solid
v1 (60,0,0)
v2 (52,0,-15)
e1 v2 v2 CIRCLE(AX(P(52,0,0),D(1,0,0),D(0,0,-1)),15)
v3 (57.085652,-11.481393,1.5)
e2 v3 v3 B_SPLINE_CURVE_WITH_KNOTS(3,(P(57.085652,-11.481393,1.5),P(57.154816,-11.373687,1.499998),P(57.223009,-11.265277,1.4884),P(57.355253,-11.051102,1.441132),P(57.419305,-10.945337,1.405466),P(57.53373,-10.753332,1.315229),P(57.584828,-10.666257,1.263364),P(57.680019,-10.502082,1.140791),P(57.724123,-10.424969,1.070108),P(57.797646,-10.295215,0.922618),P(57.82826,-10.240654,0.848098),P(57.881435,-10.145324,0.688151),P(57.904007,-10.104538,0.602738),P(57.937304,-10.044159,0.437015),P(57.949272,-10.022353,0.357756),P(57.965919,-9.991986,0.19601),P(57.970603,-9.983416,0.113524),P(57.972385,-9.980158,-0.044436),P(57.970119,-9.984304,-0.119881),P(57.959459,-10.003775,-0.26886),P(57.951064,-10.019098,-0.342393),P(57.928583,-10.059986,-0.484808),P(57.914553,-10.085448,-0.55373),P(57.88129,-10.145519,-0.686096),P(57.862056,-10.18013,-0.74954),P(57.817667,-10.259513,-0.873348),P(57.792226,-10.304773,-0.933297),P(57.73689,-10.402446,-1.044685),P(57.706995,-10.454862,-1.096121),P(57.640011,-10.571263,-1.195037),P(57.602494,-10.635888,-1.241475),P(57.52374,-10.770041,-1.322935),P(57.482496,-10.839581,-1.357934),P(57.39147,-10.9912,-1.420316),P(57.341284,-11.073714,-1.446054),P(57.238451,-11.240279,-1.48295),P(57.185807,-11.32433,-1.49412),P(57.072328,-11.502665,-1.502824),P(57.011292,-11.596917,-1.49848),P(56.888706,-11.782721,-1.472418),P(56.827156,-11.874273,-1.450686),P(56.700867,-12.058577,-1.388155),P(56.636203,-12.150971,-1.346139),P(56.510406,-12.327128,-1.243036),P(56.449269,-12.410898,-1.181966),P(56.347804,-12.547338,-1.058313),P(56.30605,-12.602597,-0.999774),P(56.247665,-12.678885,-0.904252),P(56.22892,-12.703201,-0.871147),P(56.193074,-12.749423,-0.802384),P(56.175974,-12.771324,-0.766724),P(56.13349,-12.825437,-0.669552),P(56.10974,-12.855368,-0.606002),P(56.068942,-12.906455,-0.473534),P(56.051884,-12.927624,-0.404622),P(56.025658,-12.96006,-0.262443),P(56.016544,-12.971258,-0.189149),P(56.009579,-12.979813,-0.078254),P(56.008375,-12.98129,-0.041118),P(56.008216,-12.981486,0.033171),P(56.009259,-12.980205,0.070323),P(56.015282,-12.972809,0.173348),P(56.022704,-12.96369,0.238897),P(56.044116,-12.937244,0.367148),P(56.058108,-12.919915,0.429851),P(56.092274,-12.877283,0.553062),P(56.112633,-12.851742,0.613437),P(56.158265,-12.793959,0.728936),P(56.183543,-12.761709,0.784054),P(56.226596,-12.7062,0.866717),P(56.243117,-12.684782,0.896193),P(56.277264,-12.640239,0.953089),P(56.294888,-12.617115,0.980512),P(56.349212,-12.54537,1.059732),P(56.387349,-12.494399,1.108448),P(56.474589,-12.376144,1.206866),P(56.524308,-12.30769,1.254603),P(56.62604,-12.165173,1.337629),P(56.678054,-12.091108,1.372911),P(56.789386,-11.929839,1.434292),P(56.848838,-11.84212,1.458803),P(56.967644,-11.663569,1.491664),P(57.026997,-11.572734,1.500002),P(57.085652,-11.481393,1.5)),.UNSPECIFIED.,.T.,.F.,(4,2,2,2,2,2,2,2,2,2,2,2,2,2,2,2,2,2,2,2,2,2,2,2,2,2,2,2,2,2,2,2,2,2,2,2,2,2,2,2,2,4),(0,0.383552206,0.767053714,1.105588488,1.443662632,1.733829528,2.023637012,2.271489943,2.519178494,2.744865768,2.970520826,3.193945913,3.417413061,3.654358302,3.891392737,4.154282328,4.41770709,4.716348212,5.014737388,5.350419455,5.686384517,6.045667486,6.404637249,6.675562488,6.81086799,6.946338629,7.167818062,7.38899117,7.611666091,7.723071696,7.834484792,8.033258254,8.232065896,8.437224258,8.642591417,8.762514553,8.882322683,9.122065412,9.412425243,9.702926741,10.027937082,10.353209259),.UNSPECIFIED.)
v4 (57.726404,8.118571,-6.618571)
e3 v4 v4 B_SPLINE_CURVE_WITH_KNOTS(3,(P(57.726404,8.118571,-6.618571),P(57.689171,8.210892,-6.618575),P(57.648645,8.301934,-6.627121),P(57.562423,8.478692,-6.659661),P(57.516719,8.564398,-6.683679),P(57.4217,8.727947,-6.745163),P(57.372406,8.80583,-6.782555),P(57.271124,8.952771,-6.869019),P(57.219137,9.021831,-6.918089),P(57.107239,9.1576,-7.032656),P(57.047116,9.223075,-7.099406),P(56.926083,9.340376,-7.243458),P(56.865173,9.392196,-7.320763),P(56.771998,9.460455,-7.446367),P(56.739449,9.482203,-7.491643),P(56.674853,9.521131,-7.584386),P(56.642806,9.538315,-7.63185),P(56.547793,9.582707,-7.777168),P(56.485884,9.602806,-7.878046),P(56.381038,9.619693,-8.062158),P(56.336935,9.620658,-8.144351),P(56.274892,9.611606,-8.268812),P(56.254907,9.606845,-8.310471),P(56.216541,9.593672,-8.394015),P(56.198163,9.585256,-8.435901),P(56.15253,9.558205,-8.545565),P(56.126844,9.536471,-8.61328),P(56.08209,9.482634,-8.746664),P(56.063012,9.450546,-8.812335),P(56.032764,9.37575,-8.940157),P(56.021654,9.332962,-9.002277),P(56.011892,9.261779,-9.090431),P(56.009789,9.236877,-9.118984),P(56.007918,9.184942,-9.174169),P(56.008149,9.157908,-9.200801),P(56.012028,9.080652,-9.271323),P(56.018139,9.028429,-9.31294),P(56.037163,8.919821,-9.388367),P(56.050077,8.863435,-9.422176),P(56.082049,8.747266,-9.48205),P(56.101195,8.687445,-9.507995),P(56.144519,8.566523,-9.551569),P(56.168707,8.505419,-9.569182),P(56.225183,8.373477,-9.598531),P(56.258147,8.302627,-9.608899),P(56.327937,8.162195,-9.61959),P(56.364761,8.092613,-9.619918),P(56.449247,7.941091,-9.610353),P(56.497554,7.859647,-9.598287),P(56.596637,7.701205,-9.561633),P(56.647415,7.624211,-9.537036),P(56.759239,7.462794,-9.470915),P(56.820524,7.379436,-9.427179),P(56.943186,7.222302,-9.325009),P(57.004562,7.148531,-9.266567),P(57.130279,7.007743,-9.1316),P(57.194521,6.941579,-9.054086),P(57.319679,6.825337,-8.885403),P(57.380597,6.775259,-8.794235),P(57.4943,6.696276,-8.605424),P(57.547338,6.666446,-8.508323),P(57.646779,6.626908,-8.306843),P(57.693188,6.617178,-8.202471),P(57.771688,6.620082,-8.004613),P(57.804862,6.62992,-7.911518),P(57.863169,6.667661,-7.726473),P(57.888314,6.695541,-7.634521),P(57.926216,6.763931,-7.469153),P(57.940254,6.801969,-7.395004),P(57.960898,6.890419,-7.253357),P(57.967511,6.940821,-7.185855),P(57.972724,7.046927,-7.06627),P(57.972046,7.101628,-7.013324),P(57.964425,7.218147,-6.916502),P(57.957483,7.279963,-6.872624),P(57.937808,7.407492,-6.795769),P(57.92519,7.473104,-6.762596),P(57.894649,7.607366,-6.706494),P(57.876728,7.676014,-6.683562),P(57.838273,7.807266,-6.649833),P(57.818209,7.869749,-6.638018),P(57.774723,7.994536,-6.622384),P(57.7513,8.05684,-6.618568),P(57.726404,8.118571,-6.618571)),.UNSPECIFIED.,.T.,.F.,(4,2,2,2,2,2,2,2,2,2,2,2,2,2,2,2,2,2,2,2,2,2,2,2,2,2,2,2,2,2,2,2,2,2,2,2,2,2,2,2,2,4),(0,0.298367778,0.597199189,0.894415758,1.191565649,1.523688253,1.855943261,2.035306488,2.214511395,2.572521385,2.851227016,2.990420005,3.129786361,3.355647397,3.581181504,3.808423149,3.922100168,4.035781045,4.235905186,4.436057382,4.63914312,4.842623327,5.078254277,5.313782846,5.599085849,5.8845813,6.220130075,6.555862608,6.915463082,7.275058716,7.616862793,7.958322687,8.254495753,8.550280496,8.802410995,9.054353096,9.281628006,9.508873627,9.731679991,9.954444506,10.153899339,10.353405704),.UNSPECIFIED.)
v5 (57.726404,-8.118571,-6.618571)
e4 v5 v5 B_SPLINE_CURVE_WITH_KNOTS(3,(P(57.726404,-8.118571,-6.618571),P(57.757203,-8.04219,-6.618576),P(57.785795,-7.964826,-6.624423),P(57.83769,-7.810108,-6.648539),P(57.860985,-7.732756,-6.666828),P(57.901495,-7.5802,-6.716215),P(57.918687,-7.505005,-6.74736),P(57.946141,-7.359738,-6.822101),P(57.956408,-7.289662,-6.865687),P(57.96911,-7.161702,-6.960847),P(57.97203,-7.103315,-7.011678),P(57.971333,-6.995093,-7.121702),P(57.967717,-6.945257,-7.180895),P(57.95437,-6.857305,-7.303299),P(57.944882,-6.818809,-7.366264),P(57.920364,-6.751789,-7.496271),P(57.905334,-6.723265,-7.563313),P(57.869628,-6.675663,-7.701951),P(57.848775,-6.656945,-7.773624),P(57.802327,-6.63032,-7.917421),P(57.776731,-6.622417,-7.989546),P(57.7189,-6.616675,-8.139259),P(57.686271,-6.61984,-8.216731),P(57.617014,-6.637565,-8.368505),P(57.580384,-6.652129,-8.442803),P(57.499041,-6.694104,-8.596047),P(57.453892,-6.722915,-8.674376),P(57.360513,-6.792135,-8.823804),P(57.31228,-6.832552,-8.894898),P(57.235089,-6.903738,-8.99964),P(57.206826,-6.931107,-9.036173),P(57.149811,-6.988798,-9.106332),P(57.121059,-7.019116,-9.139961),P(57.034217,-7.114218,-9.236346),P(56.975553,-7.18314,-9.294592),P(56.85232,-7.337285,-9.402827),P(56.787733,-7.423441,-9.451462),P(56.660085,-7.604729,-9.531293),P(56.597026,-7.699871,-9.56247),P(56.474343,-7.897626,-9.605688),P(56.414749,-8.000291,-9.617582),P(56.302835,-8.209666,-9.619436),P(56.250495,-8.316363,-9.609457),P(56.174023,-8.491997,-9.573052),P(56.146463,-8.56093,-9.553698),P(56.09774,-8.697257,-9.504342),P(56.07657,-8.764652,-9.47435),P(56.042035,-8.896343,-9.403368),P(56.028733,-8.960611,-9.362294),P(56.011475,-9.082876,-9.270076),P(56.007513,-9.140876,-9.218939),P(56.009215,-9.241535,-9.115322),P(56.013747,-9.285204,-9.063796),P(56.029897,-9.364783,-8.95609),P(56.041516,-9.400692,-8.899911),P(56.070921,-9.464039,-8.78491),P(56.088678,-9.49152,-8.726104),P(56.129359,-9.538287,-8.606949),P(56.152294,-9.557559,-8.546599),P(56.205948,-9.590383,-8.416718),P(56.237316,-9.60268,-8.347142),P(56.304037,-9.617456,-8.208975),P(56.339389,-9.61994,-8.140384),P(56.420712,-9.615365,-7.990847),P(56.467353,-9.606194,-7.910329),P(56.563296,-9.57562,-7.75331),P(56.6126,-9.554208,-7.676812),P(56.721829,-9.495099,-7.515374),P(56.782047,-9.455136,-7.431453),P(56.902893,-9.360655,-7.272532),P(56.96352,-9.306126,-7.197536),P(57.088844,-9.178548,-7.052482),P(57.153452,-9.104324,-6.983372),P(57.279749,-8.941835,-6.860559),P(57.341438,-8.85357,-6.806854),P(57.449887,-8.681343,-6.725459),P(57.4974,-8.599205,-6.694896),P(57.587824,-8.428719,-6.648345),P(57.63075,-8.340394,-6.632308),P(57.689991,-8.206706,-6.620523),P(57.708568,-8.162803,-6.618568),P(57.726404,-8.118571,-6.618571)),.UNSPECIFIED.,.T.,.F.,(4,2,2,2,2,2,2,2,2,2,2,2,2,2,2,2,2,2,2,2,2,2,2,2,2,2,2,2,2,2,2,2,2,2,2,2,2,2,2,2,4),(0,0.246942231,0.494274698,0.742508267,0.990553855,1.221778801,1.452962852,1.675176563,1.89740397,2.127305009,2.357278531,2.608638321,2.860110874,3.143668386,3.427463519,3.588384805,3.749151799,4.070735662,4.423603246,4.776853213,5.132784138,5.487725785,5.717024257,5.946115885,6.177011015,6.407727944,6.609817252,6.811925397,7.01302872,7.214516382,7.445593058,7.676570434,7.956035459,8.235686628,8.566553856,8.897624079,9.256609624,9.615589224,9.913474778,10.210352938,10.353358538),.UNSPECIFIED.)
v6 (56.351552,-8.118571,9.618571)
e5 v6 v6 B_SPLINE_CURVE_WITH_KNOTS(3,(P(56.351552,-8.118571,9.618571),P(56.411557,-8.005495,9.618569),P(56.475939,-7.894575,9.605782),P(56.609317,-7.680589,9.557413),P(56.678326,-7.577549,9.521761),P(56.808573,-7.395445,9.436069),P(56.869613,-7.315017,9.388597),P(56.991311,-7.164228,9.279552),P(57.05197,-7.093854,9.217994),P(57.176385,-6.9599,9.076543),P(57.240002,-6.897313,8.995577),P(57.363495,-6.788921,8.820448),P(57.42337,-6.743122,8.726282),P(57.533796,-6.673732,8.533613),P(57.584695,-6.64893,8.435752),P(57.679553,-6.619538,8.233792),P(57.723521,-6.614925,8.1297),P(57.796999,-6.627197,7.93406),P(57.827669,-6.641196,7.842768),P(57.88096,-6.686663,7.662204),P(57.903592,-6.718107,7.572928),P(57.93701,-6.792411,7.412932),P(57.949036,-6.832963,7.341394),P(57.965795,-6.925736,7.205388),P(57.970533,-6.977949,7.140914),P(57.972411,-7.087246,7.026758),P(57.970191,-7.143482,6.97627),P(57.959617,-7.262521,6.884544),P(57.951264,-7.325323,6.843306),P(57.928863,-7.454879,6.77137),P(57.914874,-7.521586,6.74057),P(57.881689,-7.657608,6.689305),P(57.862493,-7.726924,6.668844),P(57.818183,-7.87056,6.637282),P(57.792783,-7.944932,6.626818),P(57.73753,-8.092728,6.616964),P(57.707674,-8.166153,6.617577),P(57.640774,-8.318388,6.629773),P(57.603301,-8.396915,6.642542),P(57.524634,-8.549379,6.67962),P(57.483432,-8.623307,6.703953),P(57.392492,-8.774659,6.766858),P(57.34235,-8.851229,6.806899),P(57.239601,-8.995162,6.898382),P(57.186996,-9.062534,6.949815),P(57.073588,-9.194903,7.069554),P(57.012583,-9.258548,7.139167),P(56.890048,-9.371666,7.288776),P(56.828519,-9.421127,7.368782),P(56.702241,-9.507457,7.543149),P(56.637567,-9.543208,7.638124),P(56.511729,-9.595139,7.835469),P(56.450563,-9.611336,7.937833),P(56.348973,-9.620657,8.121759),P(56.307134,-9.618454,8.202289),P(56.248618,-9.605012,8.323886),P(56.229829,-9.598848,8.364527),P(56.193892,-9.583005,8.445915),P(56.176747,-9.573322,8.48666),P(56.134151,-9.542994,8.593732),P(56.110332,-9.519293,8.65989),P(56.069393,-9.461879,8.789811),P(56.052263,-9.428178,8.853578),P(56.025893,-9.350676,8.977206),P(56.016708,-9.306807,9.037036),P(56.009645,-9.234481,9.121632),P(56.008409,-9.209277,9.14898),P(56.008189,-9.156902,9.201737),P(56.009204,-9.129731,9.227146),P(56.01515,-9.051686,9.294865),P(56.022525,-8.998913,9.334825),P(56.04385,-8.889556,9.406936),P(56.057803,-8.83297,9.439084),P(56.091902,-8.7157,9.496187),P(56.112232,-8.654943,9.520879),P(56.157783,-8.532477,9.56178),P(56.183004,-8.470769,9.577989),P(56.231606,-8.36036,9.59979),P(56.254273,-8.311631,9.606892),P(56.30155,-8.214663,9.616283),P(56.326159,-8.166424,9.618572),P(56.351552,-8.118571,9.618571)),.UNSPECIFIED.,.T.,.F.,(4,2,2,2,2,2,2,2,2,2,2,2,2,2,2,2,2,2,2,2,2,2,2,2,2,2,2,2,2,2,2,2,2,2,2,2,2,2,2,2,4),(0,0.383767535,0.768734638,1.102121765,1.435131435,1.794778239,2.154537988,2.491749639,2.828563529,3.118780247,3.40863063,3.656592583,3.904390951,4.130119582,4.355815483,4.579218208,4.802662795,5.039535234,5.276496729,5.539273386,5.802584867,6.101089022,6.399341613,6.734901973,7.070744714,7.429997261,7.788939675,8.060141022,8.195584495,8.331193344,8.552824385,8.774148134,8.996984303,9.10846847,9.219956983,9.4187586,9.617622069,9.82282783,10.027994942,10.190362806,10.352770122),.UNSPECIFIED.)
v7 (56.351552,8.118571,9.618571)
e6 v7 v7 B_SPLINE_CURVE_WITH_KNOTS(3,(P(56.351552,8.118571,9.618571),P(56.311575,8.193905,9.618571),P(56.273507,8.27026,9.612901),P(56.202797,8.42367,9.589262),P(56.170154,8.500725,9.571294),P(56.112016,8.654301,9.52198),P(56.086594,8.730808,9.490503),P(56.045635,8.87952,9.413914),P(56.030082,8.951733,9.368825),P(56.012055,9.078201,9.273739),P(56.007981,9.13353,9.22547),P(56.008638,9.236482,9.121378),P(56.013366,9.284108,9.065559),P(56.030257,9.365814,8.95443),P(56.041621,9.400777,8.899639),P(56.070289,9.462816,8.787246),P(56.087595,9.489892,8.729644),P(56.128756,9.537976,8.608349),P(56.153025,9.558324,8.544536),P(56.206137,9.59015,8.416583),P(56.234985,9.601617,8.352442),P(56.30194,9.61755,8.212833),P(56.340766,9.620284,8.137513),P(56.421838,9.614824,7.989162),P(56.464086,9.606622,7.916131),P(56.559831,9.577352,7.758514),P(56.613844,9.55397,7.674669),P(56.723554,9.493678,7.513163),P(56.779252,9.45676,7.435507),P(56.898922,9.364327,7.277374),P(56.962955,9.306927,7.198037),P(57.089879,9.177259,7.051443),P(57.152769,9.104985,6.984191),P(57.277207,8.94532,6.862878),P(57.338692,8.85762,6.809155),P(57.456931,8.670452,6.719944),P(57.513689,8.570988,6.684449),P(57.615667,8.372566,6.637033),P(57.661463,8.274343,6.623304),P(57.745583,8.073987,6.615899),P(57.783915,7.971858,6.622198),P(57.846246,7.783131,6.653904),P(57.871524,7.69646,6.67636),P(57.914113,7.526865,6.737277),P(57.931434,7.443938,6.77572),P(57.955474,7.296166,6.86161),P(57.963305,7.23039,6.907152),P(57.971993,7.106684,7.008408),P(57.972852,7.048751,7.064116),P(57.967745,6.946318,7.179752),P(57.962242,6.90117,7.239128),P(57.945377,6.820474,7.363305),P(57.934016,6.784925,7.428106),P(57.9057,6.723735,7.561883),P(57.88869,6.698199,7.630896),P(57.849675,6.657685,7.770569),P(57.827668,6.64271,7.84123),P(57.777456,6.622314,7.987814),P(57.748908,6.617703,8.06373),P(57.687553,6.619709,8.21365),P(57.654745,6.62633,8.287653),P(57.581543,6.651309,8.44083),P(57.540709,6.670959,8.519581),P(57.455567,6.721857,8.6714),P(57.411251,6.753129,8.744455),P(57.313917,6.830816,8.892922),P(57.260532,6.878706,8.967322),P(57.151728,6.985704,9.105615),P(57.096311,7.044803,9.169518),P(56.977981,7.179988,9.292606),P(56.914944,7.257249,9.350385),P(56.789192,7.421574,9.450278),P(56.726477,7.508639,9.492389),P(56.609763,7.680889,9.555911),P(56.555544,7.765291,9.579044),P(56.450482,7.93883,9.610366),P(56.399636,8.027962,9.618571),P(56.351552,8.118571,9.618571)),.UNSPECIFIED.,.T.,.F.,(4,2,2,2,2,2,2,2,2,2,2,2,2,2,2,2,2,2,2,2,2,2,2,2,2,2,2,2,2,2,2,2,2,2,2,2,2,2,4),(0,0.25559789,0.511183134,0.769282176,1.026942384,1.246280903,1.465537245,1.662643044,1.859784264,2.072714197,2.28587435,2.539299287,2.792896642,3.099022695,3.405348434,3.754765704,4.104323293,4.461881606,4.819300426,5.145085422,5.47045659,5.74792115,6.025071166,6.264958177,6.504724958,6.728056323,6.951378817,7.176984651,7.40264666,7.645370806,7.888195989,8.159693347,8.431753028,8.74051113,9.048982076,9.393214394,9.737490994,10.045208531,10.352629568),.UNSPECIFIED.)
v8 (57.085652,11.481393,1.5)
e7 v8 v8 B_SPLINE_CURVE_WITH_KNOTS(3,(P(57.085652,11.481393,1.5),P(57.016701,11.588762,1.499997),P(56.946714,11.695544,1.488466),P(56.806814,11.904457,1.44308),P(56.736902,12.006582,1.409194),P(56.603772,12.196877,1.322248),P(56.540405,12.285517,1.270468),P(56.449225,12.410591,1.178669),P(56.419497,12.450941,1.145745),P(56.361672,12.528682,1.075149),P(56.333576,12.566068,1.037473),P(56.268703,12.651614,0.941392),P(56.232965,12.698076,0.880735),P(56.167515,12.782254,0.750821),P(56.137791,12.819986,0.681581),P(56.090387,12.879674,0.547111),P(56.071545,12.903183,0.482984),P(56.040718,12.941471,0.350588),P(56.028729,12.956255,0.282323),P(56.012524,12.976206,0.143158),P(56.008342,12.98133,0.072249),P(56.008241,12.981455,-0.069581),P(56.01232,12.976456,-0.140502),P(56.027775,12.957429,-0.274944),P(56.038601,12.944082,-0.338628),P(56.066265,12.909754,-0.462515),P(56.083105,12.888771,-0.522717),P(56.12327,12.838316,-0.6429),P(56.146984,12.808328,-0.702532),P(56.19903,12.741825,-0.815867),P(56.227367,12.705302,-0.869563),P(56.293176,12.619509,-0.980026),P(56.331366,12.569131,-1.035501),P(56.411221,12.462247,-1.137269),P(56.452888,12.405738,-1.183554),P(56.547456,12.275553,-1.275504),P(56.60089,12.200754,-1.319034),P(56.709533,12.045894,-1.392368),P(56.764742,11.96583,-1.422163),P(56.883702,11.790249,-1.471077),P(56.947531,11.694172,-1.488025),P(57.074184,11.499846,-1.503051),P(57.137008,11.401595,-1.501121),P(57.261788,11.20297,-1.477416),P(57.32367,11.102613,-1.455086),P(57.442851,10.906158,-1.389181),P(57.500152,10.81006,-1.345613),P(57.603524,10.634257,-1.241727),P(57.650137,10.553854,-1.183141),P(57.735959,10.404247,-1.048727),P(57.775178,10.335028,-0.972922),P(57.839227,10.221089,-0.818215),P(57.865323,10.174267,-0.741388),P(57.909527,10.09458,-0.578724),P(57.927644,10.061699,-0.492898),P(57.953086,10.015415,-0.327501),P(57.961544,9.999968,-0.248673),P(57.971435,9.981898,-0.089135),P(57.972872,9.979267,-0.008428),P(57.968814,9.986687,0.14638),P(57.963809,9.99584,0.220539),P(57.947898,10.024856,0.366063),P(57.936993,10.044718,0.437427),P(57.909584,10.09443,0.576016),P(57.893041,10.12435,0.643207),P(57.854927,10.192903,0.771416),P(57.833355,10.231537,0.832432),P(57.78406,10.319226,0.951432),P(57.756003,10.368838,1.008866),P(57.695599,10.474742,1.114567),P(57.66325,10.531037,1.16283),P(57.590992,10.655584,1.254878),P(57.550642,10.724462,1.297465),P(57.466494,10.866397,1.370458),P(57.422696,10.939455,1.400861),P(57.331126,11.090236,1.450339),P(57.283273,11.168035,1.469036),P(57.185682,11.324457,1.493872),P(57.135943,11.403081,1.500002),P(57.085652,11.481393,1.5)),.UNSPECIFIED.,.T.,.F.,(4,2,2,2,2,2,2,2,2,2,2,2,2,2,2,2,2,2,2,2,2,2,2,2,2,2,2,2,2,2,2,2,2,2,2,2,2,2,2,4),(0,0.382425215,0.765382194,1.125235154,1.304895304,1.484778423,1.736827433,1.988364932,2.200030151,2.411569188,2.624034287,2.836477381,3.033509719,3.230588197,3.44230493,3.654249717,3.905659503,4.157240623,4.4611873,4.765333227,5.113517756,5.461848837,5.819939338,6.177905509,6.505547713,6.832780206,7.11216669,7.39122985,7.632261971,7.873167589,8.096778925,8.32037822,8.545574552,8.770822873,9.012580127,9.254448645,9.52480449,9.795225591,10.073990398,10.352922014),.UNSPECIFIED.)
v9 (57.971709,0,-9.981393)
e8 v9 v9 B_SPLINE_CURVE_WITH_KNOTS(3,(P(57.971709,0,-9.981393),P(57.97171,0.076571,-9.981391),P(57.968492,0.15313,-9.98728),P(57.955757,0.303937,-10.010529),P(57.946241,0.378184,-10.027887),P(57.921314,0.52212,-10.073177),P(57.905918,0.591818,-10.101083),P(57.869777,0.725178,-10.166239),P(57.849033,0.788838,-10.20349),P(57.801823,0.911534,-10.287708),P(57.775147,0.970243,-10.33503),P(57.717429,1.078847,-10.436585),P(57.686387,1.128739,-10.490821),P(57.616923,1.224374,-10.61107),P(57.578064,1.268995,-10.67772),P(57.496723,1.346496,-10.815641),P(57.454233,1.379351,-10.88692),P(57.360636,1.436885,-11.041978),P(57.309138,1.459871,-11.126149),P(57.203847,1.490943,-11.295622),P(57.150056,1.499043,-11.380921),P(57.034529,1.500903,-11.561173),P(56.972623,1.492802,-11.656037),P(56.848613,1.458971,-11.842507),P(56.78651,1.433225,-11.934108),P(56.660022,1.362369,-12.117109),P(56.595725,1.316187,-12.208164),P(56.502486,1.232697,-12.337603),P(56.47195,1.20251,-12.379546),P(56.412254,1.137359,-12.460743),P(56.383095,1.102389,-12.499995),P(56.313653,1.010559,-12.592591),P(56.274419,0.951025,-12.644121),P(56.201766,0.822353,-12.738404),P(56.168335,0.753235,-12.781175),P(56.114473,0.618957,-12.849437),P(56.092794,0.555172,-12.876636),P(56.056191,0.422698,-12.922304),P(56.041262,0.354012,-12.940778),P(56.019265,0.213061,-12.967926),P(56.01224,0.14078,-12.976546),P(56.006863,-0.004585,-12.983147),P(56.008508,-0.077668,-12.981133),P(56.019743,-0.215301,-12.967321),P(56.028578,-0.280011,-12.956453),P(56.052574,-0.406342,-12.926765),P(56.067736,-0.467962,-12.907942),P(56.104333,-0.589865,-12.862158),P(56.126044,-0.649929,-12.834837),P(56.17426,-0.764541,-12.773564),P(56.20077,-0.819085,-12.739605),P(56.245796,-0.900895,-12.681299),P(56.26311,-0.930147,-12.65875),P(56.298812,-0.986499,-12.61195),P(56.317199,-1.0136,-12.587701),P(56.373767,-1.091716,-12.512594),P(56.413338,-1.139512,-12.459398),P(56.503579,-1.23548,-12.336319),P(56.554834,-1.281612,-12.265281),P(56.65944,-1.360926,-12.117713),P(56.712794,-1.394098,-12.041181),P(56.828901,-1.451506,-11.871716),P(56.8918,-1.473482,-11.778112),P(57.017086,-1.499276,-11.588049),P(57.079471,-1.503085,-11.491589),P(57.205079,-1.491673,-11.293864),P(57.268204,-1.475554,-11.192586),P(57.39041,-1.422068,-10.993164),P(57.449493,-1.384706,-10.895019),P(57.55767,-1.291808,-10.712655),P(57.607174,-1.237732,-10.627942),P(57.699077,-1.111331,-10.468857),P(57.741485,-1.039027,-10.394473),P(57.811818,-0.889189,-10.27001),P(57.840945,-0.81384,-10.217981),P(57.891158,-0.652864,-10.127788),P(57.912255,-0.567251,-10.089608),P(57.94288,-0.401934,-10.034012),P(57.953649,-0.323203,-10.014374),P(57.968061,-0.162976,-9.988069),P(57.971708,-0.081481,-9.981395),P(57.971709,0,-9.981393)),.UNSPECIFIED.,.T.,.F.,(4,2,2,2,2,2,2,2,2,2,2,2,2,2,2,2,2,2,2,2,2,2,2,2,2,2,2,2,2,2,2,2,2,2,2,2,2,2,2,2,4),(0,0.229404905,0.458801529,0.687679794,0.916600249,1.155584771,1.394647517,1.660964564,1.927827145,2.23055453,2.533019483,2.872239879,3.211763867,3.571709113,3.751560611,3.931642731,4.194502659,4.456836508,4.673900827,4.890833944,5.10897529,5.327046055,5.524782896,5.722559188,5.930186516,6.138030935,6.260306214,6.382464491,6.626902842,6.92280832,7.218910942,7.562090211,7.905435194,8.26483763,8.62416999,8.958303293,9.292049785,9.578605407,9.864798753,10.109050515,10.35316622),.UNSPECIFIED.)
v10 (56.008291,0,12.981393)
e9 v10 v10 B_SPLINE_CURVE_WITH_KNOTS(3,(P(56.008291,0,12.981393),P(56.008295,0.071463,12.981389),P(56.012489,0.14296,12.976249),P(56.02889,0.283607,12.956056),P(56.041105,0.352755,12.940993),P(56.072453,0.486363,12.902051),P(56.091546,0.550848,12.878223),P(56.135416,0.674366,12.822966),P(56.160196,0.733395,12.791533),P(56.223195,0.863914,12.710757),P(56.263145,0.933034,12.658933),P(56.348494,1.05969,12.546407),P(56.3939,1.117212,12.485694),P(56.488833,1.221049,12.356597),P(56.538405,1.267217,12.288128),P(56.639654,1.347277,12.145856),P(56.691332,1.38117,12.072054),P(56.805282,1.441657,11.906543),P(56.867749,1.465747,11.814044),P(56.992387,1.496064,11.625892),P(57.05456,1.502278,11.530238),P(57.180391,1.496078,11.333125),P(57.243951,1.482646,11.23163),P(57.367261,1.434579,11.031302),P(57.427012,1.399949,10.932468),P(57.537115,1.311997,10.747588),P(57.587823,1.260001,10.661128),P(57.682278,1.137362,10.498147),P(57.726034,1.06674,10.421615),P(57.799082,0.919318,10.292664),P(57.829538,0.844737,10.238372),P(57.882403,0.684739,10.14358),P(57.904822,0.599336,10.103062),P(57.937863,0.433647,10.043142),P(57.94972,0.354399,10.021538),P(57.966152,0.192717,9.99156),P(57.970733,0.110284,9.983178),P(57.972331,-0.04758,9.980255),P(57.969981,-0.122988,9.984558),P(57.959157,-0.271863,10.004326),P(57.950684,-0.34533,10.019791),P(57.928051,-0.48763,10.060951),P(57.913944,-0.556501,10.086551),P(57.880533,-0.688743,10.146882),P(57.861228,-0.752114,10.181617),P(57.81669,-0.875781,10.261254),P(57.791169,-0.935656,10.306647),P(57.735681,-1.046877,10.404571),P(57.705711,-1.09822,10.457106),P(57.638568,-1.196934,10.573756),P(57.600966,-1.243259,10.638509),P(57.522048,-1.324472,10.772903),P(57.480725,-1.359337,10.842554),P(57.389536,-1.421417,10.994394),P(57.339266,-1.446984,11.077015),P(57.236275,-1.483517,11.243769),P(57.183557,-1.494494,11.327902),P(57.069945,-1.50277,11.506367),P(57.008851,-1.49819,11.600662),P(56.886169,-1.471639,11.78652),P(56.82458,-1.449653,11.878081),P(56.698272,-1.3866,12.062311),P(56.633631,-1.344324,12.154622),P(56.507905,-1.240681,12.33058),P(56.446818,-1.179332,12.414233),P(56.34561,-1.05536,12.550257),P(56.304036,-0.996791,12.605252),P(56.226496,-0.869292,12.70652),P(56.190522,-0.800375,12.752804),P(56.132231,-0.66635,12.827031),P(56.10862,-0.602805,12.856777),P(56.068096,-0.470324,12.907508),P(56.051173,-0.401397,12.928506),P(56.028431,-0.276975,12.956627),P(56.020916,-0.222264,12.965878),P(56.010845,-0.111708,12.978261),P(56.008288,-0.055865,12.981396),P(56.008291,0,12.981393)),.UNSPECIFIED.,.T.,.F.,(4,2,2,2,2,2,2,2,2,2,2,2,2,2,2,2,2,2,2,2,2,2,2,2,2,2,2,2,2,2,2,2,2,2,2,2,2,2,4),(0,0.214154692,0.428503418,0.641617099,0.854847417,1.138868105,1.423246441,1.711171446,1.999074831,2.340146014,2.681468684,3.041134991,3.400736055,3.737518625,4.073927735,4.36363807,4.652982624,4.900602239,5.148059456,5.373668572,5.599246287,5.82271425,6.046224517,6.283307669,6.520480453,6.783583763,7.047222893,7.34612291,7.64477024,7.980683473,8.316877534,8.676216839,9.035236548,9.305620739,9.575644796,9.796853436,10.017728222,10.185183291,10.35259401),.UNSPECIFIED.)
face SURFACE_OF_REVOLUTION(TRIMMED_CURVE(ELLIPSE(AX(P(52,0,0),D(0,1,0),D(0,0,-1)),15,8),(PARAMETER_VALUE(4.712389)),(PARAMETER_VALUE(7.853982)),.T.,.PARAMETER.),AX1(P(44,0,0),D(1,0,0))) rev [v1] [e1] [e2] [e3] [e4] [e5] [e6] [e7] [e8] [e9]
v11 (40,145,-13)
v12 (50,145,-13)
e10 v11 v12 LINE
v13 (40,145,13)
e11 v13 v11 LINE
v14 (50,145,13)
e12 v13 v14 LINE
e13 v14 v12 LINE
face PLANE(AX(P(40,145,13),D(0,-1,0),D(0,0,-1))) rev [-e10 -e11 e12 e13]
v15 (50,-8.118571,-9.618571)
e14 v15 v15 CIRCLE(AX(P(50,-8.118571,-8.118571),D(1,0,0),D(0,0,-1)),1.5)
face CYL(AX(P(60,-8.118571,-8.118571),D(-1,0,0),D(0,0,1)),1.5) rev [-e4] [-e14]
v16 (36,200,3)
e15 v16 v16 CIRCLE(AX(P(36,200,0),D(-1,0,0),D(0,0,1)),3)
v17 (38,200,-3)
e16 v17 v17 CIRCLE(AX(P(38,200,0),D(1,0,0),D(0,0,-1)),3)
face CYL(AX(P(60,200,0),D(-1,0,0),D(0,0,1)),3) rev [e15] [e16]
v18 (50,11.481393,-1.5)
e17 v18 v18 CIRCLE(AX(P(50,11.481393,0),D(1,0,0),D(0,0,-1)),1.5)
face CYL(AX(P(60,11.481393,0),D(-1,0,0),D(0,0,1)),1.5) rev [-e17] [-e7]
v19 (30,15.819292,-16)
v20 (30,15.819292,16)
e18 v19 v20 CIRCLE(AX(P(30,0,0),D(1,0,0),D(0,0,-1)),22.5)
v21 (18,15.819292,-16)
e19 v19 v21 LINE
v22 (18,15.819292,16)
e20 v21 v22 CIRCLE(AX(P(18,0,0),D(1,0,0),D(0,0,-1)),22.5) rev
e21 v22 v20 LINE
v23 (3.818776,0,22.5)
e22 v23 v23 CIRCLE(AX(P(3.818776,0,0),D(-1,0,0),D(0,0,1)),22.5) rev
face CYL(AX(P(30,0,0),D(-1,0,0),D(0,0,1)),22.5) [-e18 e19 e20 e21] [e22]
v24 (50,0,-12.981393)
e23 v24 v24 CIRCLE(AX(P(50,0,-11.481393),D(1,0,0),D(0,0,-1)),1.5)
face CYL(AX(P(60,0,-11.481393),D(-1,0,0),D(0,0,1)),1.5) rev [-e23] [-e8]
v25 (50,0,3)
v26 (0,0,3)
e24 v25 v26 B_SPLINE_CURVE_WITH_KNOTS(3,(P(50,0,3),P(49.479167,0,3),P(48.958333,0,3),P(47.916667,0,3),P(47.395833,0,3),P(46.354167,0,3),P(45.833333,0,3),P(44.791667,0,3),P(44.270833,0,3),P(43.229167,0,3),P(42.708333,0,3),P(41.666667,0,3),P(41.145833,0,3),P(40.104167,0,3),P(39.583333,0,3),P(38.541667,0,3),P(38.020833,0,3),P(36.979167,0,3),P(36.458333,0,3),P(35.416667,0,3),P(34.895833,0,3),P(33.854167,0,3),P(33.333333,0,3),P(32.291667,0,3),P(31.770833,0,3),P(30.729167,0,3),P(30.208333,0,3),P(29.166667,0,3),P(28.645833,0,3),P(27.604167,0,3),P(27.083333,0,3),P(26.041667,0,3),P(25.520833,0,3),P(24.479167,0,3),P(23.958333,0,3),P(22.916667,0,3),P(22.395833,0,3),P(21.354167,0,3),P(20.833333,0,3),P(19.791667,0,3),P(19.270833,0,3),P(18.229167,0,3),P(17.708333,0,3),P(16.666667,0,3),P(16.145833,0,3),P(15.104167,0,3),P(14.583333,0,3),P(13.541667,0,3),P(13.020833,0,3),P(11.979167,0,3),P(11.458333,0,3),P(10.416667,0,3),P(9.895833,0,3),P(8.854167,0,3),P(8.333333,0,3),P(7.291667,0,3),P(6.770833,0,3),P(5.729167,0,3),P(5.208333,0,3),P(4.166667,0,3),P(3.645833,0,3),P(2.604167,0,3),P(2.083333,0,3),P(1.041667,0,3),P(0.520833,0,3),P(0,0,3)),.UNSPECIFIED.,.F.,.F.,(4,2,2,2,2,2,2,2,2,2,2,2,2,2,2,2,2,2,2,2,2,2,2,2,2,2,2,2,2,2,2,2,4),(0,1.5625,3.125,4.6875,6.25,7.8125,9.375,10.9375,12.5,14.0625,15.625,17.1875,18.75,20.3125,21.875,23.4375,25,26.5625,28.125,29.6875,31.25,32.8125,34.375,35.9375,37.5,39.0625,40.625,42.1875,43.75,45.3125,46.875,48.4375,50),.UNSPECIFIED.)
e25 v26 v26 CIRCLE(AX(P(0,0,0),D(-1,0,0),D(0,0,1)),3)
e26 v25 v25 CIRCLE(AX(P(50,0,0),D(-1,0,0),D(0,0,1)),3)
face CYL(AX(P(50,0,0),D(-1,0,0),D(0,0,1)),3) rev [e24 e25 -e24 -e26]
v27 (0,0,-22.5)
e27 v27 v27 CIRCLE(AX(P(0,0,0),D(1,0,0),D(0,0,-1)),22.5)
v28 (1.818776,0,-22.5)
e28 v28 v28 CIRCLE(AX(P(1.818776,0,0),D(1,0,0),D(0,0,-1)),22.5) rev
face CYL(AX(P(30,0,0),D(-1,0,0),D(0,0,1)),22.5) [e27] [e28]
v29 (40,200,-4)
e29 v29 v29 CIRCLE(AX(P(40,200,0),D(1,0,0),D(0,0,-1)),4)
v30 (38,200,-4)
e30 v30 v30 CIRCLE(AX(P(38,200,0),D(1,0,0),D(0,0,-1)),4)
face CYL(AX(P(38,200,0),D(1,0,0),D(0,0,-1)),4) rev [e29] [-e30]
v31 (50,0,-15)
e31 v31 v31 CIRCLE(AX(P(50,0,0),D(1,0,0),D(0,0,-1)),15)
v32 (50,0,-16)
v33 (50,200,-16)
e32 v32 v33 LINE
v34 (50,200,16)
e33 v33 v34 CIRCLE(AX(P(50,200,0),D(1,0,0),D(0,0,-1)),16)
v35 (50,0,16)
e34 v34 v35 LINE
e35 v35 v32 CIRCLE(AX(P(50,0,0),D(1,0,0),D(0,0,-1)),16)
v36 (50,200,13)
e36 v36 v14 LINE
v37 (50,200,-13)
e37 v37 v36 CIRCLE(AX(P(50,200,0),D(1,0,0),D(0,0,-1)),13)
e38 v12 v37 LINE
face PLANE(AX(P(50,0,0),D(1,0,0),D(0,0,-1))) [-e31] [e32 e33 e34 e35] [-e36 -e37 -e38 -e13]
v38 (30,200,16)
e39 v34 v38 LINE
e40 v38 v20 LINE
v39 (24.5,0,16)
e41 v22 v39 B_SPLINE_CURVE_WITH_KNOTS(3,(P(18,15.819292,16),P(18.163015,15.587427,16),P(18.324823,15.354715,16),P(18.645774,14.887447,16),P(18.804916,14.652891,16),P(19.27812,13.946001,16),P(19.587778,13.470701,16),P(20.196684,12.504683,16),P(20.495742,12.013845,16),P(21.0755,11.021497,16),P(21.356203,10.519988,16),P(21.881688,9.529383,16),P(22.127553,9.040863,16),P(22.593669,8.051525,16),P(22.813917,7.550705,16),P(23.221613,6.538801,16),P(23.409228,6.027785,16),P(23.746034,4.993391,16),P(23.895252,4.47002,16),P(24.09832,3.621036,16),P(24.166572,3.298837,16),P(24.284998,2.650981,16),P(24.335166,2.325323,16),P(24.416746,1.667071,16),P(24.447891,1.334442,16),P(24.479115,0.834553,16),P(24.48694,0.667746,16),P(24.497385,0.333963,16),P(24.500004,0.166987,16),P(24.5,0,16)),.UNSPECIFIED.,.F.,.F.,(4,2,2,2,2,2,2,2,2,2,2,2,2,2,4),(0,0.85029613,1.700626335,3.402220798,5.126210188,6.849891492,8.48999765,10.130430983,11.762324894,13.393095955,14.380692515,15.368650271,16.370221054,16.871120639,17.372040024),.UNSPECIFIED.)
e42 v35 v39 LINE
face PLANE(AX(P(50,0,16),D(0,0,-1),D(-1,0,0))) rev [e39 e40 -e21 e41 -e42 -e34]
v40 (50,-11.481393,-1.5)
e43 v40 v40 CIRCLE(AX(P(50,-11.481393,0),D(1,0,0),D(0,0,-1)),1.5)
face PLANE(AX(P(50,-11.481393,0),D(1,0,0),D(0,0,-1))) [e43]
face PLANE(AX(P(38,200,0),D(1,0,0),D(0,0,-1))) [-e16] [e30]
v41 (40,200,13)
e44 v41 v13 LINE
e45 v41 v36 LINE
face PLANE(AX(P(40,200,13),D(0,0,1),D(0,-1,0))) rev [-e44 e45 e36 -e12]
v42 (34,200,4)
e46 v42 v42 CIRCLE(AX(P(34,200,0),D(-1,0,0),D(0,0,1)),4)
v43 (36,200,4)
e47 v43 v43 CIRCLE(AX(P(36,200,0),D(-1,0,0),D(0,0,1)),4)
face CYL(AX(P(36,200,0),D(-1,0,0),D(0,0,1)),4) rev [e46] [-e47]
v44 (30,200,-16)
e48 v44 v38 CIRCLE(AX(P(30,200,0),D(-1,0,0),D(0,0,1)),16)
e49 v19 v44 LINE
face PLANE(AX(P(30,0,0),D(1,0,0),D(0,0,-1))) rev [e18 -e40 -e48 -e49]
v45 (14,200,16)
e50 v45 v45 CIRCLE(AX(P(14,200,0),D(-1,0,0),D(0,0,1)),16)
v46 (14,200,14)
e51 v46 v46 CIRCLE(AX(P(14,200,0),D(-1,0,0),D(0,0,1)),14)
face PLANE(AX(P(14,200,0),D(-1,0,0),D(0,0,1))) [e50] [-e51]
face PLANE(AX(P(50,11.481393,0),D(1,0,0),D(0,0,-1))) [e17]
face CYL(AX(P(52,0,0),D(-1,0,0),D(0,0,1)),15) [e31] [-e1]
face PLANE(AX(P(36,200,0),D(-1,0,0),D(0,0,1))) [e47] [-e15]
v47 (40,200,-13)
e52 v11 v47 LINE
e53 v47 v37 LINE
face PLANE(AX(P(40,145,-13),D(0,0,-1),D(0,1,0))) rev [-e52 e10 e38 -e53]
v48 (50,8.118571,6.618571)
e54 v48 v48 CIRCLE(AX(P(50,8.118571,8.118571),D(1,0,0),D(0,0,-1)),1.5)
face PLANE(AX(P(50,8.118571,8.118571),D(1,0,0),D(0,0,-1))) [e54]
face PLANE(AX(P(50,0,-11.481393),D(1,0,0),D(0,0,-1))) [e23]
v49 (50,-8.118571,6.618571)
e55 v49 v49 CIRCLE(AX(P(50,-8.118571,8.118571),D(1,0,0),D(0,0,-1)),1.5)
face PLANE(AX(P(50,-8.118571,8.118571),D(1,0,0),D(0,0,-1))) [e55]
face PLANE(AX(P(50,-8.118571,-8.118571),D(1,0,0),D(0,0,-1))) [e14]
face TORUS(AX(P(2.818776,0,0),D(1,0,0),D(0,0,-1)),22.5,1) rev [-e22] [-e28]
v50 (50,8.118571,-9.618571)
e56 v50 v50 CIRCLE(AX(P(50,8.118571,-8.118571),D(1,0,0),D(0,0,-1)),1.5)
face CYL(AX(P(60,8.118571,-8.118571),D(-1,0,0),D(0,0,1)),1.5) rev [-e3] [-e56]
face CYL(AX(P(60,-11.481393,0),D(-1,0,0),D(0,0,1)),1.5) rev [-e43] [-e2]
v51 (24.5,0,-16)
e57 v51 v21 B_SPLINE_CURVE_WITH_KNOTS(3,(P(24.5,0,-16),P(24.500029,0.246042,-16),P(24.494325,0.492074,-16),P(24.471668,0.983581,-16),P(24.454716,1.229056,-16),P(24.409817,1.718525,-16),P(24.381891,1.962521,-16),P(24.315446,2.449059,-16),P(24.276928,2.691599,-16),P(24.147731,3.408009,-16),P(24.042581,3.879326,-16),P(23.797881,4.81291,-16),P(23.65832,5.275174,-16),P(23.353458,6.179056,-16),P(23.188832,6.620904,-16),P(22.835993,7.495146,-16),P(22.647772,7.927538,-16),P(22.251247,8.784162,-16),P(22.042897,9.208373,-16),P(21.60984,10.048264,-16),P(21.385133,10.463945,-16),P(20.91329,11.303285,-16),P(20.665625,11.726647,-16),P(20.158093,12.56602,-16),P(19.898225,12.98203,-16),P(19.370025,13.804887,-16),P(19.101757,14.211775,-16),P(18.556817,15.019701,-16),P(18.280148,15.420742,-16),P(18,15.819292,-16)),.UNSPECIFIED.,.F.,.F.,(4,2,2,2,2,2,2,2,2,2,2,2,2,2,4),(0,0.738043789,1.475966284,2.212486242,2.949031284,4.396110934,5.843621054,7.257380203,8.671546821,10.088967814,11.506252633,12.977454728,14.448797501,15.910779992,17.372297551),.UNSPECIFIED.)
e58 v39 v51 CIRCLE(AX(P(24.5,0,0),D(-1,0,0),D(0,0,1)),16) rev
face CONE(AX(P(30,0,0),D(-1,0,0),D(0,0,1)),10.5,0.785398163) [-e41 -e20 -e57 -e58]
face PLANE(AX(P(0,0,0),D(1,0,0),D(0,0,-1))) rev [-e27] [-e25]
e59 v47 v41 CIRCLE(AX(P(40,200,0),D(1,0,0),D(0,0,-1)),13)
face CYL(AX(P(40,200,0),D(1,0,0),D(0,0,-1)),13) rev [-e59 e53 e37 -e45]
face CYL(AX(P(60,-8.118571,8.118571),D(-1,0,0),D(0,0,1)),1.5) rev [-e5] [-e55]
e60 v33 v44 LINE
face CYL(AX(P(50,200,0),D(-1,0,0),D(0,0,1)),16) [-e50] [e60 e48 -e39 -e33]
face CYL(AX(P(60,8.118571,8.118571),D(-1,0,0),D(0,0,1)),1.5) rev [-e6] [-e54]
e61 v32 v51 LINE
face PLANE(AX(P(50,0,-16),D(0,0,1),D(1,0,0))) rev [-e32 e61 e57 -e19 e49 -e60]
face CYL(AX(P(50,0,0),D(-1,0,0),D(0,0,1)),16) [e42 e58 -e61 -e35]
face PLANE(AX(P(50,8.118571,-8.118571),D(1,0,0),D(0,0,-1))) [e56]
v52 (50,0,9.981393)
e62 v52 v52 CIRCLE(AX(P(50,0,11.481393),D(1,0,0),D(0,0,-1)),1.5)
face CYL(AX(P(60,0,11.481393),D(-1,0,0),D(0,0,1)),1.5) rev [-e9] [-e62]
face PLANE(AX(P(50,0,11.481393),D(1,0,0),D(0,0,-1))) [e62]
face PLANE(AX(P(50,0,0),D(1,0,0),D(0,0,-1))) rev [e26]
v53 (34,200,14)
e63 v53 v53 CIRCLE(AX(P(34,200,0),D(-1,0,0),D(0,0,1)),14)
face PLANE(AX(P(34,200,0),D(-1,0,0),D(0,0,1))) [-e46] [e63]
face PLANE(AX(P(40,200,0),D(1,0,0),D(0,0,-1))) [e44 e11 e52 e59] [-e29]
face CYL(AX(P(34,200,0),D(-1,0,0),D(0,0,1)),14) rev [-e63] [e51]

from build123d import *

# Parameters (mm, degrees)
SKETCH2_R           = 22.5
BOSS_EXTRUDE1_DEPTH = 30
BOSS_EXTRUDE2_DEPTH = 20
CHAMFER1_START      = 18
CHAMFER1_OUTLINE_R  = 22.5
CHAMFER1_DEPTH      = 12
CHAMFER1_3_DEPTH    = 12
SKETCH8_R           = 3
CUT_EXTRUDE4_DEPTH  = 50
CUT_EXTRUDE5_DEPTH  = 10
SKETCH9_R           = 15
BOSS_EXTRUDE3_DEPTH = 2
DOME1_FACE_RADIUS   = 15
DOME1_HEIGHT        = 8
SKETCH13_R          = 1.5
CUT_EXTRUDE6_DEPTH  = 223.850286
SKETCH14_R          = 1
BOSS_EXTRUDE5_START = 16
SKETCH15_R          = 16
BOSS_EXTRUDE5_DEPTH = 16
SKETCH16_R          = 14
CUT_EXTRUDE7_DEPTH  = 20
SKETCH17_R          = 4
CUT_EXTRUDE8_DEPTH  = 2
CUT_EXTRUDE9_START  = -2
SKETCH18_R          = 4
CUT_EXTRUDE9_DEPTH  = 2
SKETCH19_R          = 3
CUT_EXTRUDE10_DEPTH = 221.132347


with BuildPart() as part:
    # Sketch2 → Boss-Extrude1 (new body)
    with BuildSketch(Plane(origin=(0, 0, 0), x_dir=(0, 0, -1), z_dir=(1, 0, 0))):
        Circle(SKETCH2_R)
    extrude(amount=BOSS_EXTRUDE1_DEPTH)

    # Sketch3 → Boss-Extrude2 (add)
    with BuildSketch(Plane(origin=(30, 0, 0), x_dir=(0, 0, -1), z_dir=(1, 0, 0))):
        with BuildLine():
            Line((-16, 0), (-16, 200))
            ThreePointArc((-16, 200), (0, 216), (16, 200))
            Line((16, 200), (16, 0))
            ThreePointArc((16, 0), (0, -16), (-16, 0))
        make_face()
    extrude(amount=BOSS_EXTRUDE2_DEPTH)

    # Chamfer1: read off the stored shape, not the designer's step
    # Chamfer1 outline → Chamfer1 (cut)
    with BuildSketch(Plane.YZ.offset(CHAMFER1_START)):
        Circle(CHAMFER1_OUTLINE_R)
    extrude(amount=CHAMFER1_DEPTH, mode=Mode.SUBTRACT)

    # Chamfer1 2 outline → Chamfer1 2 (revolve)
    with BuildSketch(Plane.YX):
        Polygon((0, 18), (22.5, 18), (15.999995, 24.500005), (0, 24.500005), align=None)
    revolve(axis=Axis((0, 0, 0), (1, 0, 0)))

    # Chamfer1 3 outline → Chamfer1 3 (add)
    with BuildSketch(Plane.YZ.offset(CHAMFER1_START)):
        with BuildLine():
            ThreePointArc((15.819292, -16), (22.5, 0), (15.819292, 16))
            Line((15.819292, 16), (0, 16))
            ThreePointArc((0, 16), (-16, 0), (0, -16))
            Line((0, -16), (15.819292, -16))
        make_face()
    extrude(amount=CHAMFER1_3_DEPTH)

    # Sketch8 → Cut-Extrude4 (cut)
    with BuildSketch(Plane.ZY):
        Circle(SKETCH8_R)
    extrude(amount=-CUT_EXTRUDE4_DEPTH, mode=Mode.SUBTRACT)

    # Sketch12 → Cut-Extrude5 (cut)
    with BuildSketch(Plane(origin=(50, 0, 0), x_dir=(0, 0, -1), z_dir=(1, 0, 0))):
        with BuildLine():
            Line((-13, 200), (-13, 145))
            Line((-13, 145), (13, 145))
            Line((13, 145), (13, 200))
            ThreePointArc((13, 200), (0, 213), (-13, 200))
        make_face()
    extrude(amount=-CUT_EXTRUDE5_DEPTH, mode=Mode.SUBTRACT)

    # Sketch9 → Boss-Extrude3 (add)
    with BuildSketch(Plane(origin=(50, 0, 0), x_dir=(0, 0, -1), z_dir=(1, 0, 0))):
        Circle(SKETCH9_R)
    extrude(amount=BOSS_EXTRUDE3_DEPTH)

    # Dome1: an elliptical dome of height H over a round flat face of radius A is half a spheroid: the quarter ellipse of half axes A and H revolved about the face's axis
    with BuildSketch(Plane((52, 0, 0), x_dir=(0, 0, 1), z_dir=(0, 1, 0)), mode=Mode.PRIVATE) as dome1_quarter:
        Ellipse(DOME1_FACE_RADIUS, DOME1_HEIGHT)
        Rectangle(DOME1_FACE_RADIUS, DOME1_HEIGHT, align=(Align.MIN, Align.MIN), mode=Mode.INTERSECT)
    revolve(dome1_quarter.sketch, axis=Axis((52, 0, 0), (1, 0, 0)))

    # Sketch13 → Cut-Extrude6 (cut, through all)
    with BuildSketch(Plane(origin=(50, 0, 0), x_dir=(0, 0, -1), z_dir=(1, 0, 0))):
        with Locations(Location((0, 11.481393, 0), (0, 0, 180))):
            Circle(SKETCH13_R)
        with Locations(Location((8.118571, 8.118571, 0), (0, 0, 180))):
            Circle(SKETCH13_R)
        with Locations((11.481393, 0)):
            Circle(SKETCH13_R)
        with Locations(Location((8.118571, -8.118571, 0), (0, 0, 180))):
            Circle(SKETCH13_R)
        with Locations(Location((0, -11.481393, 0), (0, 0, 180))):
            Circle(SKETCH13_R)
        with Locations(Location((-8.118571, -8.118571, 0), (0, 0, 180))):
            Circle(SKETCH13_R)
        with Locations(Location((-11.481393, 0, 0), (0, 0, 180))):
            Circle(SKETCH13_R)
        with Locations(Location((-8.118571, 8.118571, 0), (0, 0, 180))):
            Circle(SKETCH13_R)
    extrude(amount=CUT_EXTRUDE6_DEPTH, mode=Mode.SUBTRACT)

    # Sketch14 → Cut-Revolve1 (revolve, cut)
    with BuildSketch(Plane.XY, mode=Mode.PRIVATE) as cut_revolve1_sk:
        with Locations((2.818776, 22.5)):
            Circle(SKETCH14_R)
    revolve(cut_revolve1_sk.sketch.rotate(Axis((0, 0, 0), (-1, 0, 0)), 90), axis=Axis((0, 0, 0), (-1, 0, 0)), mode=Mode.SUBTRACT)

    # Sketch15 → Boss-Extrude5 (add)
    with BuildSketch(Plane.ZY.offset(-30).offset(BOSS_EXTRUDE5_START)):
        with Locations((0, 200)):
            Circle(SKETCH15_R)
    extrude(amount=-BOSS_EXTRUDE5_DEPTH)

    # Sketch16 → Cut-Extrude7 (cut)
    with BuildSketch(Plane.ZY.offset(-14)):
        with Locations((0, 200)):
            Circle(SKETCH16_R)
    extrude(amount=-CUT_EXTRUDE7_DEPTH, mode=Mode.SUBTRACT)

    # Sketch17 → Cut-Extrude8 (cut)
    with BuildSketch(Plane.ZY.offset(-34)):
        with Locations((0, 200)):
            Circle(SKETCH17_R)
    extrude(amount=-CUT_EXTRUDE8_DEPTH, mode=Mode.SUBTRACT)

    # Sketch18 → Cut-Extrude9 (cut)
    with BuildSketch(Plane(origin=(40, 0, 0), x_dir=(0, 0, -1), z_dir=(1, 0, 0)).offset(CUT_EXTRUDE9_START)):
        with Locations(Location((0, 200, 0), (0, 0, 180))):
            Circle(SKETCH18_R)
    extrude(amount=CUT_EXTRUDE9_DEPTH, mode=Mode.SUBTRACT)

    # Sketch19 → Cut-Extrude10 (cut, through all)
    with BuildSketch(Plane.ZY.offset(-36)):
        with Locations((0, 200)):
            Circle(SKETCH19_R)
    extrude(amount=-CUT_EXTRUDE10_DEPTH, mode=Mode.SUBTRACT)


solid = part.part
